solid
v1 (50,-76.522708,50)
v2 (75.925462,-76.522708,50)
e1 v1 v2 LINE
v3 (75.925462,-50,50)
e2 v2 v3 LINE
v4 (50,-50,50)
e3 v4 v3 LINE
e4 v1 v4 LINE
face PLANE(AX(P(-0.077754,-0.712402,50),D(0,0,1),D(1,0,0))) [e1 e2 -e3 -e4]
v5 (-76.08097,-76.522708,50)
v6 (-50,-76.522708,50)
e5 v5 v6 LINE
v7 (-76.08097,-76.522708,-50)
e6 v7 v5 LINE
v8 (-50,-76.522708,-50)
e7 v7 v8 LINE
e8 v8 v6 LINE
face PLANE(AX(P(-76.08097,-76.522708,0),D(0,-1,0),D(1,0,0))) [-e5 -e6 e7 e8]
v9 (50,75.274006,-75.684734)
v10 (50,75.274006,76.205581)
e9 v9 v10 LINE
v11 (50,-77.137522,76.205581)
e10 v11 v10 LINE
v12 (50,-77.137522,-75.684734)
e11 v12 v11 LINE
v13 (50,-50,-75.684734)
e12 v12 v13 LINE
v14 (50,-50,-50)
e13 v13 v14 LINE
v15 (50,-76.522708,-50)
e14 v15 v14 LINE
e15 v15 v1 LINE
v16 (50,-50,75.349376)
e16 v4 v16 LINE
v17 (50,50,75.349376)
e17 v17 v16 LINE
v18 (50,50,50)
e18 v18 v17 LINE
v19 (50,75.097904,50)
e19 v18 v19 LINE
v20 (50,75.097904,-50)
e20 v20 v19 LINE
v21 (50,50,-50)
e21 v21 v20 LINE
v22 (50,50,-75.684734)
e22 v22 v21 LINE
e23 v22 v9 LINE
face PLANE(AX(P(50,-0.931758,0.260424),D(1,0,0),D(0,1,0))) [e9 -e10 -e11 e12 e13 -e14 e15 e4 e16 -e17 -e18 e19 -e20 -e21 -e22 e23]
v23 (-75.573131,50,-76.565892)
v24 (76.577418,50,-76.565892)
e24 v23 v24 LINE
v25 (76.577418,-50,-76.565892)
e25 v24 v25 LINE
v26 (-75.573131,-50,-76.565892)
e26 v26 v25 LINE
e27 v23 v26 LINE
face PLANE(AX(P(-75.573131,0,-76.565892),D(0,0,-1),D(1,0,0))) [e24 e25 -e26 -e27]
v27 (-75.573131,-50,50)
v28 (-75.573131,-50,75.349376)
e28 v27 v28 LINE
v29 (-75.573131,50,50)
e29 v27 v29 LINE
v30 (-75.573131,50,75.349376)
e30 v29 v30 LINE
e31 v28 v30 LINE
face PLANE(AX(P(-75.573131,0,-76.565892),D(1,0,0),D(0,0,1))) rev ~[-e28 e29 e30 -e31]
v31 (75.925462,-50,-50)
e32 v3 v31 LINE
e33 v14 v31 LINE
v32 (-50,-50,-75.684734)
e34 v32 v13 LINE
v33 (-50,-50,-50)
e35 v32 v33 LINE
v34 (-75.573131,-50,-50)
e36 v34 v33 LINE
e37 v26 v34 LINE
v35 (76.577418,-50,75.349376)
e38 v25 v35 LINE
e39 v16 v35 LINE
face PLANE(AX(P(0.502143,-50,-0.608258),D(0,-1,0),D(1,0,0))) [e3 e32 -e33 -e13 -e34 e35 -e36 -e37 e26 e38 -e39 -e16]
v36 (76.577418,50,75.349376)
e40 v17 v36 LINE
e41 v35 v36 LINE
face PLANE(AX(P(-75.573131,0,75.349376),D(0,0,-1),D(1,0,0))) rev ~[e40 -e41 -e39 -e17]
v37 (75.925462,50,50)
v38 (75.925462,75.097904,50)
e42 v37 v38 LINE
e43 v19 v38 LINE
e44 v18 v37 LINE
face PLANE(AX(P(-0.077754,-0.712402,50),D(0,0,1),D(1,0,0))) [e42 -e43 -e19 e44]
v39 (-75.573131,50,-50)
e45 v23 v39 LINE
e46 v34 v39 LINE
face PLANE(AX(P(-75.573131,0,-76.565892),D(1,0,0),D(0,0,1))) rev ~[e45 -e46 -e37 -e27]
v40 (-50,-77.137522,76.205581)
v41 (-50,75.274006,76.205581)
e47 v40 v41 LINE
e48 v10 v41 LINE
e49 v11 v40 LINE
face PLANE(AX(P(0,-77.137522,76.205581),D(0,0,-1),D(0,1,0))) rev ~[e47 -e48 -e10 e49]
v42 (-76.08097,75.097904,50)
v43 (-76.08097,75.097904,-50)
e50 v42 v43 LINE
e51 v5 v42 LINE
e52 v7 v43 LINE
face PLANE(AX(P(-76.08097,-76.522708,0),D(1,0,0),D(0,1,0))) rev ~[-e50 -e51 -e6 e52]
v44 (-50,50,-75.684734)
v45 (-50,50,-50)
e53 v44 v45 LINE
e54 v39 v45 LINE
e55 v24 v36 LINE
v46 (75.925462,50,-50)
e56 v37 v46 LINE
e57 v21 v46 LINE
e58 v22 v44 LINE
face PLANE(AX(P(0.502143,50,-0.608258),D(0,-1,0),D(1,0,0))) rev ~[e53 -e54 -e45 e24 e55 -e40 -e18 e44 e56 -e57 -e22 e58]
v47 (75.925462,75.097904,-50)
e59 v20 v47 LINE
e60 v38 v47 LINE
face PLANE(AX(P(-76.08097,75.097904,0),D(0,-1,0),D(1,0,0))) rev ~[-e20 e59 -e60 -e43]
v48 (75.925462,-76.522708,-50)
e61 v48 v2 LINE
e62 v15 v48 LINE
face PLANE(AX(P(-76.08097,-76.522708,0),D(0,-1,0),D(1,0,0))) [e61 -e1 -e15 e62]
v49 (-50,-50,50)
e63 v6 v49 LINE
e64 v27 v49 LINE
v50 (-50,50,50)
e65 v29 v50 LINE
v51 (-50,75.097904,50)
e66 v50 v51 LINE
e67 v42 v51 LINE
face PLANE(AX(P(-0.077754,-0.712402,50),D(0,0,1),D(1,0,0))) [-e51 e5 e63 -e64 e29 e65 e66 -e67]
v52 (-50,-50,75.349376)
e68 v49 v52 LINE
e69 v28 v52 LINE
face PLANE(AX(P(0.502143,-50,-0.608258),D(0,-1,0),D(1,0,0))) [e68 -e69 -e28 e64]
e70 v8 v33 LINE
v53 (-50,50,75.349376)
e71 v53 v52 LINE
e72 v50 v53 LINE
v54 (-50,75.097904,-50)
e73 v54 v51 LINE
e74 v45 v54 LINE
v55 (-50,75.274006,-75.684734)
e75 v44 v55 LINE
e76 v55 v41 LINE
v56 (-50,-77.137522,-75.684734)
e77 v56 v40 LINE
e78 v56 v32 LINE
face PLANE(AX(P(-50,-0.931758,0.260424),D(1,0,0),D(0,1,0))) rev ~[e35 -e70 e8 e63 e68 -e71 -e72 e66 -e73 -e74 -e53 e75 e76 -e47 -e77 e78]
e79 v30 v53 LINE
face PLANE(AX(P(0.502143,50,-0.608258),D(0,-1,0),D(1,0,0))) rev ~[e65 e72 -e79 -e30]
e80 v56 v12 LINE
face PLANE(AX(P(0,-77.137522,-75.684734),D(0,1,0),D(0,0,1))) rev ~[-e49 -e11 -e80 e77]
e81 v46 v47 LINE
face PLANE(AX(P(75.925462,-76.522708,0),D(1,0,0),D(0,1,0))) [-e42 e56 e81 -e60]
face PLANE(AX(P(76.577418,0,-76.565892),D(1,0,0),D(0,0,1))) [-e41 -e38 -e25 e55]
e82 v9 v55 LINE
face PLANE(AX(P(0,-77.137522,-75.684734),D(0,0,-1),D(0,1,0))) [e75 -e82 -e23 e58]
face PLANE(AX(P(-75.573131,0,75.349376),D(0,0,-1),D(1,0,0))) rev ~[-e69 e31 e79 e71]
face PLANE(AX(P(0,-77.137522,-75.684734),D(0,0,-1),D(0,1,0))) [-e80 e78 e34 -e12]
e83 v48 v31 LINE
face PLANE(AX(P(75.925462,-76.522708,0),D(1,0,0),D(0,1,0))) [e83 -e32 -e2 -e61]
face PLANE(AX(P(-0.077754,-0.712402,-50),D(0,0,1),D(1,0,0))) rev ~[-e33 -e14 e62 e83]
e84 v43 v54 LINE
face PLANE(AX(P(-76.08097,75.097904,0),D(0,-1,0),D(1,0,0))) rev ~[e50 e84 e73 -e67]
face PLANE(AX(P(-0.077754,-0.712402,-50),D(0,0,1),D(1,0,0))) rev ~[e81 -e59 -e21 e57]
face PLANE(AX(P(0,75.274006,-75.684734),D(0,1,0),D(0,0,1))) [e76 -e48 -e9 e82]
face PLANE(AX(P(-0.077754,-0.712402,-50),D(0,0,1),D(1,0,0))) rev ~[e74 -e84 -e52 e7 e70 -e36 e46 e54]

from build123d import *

# Parameters (mm, degrees)
F1_W          = 152.0064324141
F1_H          = 151.6206115484
F3_DEPTH      = 50
F3_DEPTH_BACK = 50
F0_W          = 152.1505489945
F0_H          = 151.9152671099
F4_DEPTH      = 50
F4_DEPTH_BACK = 50
F2_W          = 152.4115279317
F2_H          = 151.8903151155
F5_DEPTH      = 50
F5_DEPTH_BACK = 50


# Not quite as in the source:
# - the program builds the solid bodies; features that only make, move or delete a surface that nothing else refers to are left out


with BuildPart() as f3:
    # F1 (on Top) → F3 (new body, two sides)
    with BuildSketch(Plane.XY) as f3_sk:
        with Locations((-0.0777542591, -0.7124021649)):
            Rectangle(F1_W, F1_H)
    extrude(amount=F3_DEPTH)
    extrude(f3_sk.sketch, amount=-F3_DEPTH_BACK)

    # F0 (on Front) → F4 (join, two sides)
    with BuildSketch(Plane.XZ) as f4_sk:
        with Locations((0.5021430552, -0.6082579494)):
            Rectangle(F0_W, F0_H)
    extrude(amount=F4_DEPTH)
    extrude(f4_sk.sketch, amount=-F4_DEPTH_BACK)

    # F2 (on Right) → F5 (join, two sides)
    with BuildSketch(Plane.YZ) as f5_sk:
        with Locations((-0.9317584336, 0.2604238689)):
            Rectangle(F2_W, F2_H)
    extrude(amount=F5_DEPTH)
    extrude(f5_sk.sketch, amount=-F5_DEPTH_BACK)


solid = f3.part
